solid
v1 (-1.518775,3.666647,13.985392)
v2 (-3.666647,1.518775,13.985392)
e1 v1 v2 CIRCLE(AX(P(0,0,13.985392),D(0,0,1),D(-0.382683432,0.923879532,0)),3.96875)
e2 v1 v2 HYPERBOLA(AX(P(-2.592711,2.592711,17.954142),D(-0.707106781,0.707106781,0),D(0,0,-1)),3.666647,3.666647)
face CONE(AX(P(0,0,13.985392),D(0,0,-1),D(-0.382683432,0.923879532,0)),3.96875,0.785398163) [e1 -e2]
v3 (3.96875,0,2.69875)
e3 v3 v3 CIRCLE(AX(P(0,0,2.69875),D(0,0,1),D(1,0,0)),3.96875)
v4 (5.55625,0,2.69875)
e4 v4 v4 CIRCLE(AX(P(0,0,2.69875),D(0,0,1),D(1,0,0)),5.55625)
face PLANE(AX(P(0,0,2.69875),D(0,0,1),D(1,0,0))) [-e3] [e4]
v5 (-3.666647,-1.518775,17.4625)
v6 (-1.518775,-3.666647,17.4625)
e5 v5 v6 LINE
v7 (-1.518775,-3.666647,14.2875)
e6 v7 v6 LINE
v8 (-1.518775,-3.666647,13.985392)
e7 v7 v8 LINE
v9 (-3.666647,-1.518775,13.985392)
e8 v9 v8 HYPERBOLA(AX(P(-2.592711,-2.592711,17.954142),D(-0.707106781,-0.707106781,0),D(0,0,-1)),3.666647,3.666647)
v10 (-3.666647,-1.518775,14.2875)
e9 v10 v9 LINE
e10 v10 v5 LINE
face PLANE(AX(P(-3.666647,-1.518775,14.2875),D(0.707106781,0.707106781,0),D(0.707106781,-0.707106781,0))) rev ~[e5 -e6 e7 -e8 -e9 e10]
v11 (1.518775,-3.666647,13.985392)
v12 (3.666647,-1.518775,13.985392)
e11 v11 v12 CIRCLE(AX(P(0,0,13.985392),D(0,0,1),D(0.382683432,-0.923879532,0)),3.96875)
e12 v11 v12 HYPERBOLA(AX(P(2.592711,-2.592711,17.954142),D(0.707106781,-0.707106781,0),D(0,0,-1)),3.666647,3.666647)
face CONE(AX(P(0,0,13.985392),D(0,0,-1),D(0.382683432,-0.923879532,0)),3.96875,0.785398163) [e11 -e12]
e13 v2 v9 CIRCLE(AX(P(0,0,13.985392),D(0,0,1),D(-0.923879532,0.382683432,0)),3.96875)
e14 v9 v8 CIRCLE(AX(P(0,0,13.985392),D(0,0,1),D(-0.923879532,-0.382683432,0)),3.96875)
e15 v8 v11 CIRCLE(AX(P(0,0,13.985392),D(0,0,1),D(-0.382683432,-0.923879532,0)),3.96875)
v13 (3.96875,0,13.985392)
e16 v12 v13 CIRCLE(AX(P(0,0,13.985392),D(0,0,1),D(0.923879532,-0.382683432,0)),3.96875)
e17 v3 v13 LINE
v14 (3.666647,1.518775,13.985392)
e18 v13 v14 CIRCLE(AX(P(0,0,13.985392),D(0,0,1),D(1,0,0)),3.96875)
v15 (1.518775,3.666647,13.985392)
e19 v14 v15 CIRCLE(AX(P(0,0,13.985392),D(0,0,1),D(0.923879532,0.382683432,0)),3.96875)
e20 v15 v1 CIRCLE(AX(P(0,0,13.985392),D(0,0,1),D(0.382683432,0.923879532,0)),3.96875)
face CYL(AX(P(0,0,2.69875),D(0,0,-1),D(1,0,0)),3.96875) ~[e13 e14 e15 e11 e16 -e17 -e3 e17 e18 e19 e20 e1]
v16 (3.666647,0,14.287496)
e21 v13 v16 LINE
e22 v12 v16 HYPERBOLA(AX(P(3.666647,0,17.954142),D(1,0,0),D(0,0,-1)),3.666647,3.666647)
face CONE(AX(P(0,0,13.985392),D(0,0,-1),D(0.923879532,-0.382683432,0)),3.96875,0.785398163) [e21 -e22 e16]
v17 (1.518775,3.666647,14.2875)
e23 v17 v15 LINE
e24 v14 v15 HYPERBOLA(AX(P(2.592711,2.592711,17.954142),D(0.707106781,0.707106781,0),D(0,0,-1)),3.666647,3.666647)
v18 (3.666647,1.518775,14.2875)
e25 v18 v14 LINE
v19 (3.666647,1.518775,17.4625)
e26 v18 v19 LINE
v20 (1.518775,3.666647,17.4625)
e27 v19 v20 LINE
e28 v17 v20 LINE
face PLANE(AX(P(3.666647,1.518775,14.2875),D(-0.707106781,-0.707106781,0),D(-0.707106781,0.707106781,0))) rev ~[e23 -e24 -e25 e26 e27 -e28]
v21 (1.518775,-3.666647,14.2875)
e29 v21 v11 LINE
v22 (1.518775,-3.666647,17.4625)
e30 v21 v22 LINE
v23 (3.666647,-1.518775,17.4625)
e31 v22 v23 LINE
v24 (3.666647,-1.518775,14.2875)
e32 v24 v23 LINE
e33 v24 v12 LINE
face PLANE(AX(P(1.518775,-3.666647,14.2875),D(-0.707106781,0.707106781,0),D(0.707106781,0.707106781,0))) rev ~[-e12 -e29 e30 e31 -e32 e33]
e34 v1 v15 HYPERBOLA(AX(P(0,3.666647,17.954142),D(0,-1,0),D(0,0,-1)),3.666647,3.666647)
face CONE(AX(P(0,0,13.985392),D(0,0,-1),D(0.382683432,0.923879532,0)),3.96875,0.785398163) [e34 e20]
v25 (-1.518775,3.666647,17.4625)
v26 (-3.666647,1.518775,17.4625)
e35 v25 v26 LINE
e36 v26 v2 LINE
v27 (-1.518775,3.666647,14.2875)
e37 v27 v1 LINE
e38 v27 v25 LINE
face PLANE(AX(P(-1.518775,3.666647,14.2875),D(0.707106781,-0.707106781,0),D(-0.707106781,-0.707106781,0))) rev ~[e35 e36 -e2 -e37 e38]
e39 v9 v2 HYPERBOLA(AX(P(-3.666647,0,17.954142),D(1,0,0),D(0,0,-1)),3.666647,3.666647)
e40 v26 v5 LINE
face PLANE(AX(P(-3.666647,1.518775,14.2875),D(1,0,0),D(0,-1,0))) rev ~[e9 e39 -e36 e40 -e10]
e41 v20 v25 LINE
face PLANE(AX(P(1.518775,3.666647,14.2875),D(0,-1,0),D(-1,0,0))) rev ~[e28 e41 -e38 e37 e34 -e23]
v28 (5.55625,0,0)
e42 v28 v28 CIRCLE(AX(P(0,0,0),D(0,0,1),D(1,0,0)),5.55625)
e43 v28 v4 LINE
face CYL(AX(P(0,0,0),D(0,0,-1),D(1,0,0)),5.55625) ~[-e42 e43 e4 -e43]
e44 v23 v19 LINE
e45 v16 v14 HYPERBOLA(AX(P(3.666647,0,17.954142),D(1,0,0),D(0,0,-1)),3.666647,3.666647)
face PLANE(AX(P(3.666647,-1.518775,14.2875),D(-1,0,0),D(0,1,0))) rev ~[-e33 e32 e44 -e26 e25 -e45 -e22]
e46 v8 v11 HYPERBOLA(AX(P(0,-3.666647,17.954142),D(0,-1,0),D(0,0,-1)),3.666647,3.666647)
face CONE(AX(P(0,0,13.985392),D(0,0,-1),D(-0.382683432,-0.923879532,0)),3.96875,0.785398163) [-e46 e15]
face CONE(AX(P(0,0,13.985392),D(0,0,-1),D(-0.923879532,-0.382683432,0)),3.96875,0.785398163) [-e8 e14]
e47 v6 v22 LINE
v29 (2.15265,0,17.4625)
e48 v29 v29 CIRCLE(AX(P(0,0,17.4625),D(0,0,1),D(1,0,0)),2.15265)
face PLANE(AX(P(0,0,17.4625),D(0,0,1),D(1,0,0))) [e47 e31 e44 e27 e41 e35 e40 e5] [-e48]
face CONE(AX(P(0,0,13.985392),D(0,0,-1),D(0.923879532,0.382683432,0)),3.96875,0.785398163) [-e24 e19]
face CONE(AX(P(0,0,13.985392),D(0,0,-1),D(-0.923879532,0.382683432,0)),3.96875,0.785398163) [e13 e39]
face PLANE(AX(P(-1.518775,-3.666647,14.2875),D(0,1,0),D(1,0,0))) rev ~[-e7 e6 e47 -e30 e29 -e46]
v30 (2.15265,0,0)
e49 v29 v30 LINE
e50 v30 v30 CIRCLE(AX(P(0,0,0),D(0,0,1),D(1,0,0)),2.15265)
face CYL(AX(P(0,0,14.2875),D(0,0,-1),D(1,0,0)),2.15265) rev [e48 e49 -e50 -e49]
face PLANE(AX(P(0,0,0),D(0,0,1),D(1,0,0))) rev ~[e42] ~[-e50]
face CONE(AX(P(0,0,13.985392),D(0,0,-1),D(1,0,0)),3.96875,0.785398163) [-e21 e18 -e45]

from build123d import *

# Parameters (mm, degrees)
F0_R         = 5.55625
F0_R_2       = 2.15265
F1_DEPTH     = 2.69875
F2_R         = 3.96875
F2_R_2       = 2.15265
F3_DEPTH     = 11.58875
F4_R         = 2.15265
F5_DEPTH     = 3.175
F6_T4_ANGLE  = 45
F6_T9_ANGLE  = 45
F6_T14_ANGLE = 45
F6_T19_ANGLE = 45
F6_T24_ANGLE = 45
F6_T29_ANGLE = 45
F6_T34_ANGLE = 45
F6_T39_ANGLE = 22.5
F6_T44_ANGLE = 22.5


# Not quite as in the source:
# - a fillet or chamfer that OpenCascade refuses, or shapes differently, is made with other operations: its cross-section is extruded or revolved along the edge and cut away or added


with BuildPart() as f1:
    # F0 (on Top) → F1 (new body)
    with BuildSketch(Plane.XY):
        Circle(F0_R)
        Circle(F0_R_2, mode=Mode.SUBTRACT)
    extrude(amount=F1_DEPTH)

    # F2 (on face) → F3 (join)
    with BuildSketch(Plane.XY.offset(2.69875)):
        Circle(F2_R)
        Circle(F2_R_2, mode=Mode.SUBTRACT)
    extrude(amount=F3_DEPTH)

    # F4 (on face) → F5 (join)
    with BuildSketch(Plane.XY.offset(14.2875)):
        Polygon((-3.6666468947, 1.5187748722), (-3.6666468947, -1.5187748722), (-1.5187748722, -3.6666468947), (1.5187748722, -3.6666468947), (3.6666468947, -1.5187748722), (3.6666468947, 1.5187748722), (1.5187748722, 3.6666468947), (-1.5187748722, 3.6666468947), align=None)
        Circle(F4_R, mode=Mode.SUBTRACT)
    extrude(amount=F5_DEPTH)

    # F6: chamfer of 0.3021076 on 7 edges, made by hand


with BuildPart() as f6_tool2:
    # F6_s3 → F6_t4 (revolve)
    with BuildSketch(Plane(origin=(0, 0, 0), x_dir=(0, 0, 1), z_dir=(0.3826834324, 0.9238795325, 0))):
        Polygon((13.9853924, -3.96875), (14.2875, -3.6666424), (14.2875, -3.96875), align=None)
    revolve(axis=Axis((0, 0, 14.2875), (0, 0, 1)), revolution_arc=F6_T4_ANGLE)

    split(bisect_by=Plane.YZ.offset(-3.6666468947), keep=Keep.BOTTOM)


with BuildPart() as f1_1:
    add(f1.part)

    # F6_t1: cut F6_tool2
    add(f6_tool2.part, mode=Mode.SUBTRACT)


with BuildPart() as f6_tool7:
    # F6_s8 → F6_t9 (revolve)
    with BuildSketch(Plane(origin=(0, 0, 0), x_dir=(0, 0, 1), z_dir=(0.9238795325, 0.3826834324, 0))):
        Polygon((13.9853924, -3.96875), (14.2875, -3.6666424), (14.2875, -3.96875), align=None)
    revolve(axis=Axis((0, 0, 14.2875), (0, 0, 1)), revolution_arc=F6_T9_ANGLE)

    split(bisect_by=Plane(origin=(-2.5927108834, 2.5927108834, 0), x_dir=(0, 0, 1), z_dir=(-0.7071067812, 0.7071067812, 0)), keep=Keep.TOP)


with BuildPart() as f1_2:
    add(f1_1.part)

    # F6_t6: cut F6_tool7
    add(f6_tool7.part, mode=Mode.SUBTRACT)


with BuildPart() as f6_tool12:
    # F6_s13 → F6_t14 (revolve)
    with BuildSketch(Plane(origin=(0, 0, 0), x_dir=(0, 0, 1), z_dir=(0.9238795325, -0.3826834324, 0))):
        Polygon((13.9853924, -3.96875), (14.2875, -3.6666424), (14.2875, -3.96875), align=None)
    revolve(axis=Axis((0, 0, 14.2875), (0, 0, 1)), revolution_arc=F6_T14_ANGLE)

    split(bisect_by=Plane.XZ.offset(-3.6666468947), keep=Keep.BOTTOM)


with BuildPart() as f1_3:
    add(f1_2.part)

    # F6_t11: cut F6_tool12
    add(f6_tool12.part, mode=Mode.SUBTRACT)


with BuildPart() as f6_tool17:
    # F6_s18 → F6_t19 (revolve)
    with BuildSketch(Plane(origin=(0, 0, 0), x_dir=(0, 0, 1), z_dir=(0.3826834324, -0.9238795325, 0))):
        Polygon((13.9853924, -3.96875), (14.2875, -3.6666424), (14.2875, -3.96875), align=None)
    revolve(axis=Axis((0, 0, 14.2875), (0, 0, 1)), revolution_arc=F6_T19_ANGLE)

    split(bisect_by=Plane(origin=(2.5927108834, 2.5927108834, 0), x_dir=(0, 0, 1), z_dir=(0.7071067812, 0.7071067812, 0)), keep=Keep.TOP)


with BuildPart() as f1_4:
    add(f1_3.part)

    # F6_t16: cut F6_tool17
    add(f6_tool17.part, mode=Mode.SUBTRACT)


with BuildPart() as f6_tool22:
    # F6_s23 → F6_t24 (revolve)
    with BuildSketch(Plane(origin=(0, 0, 0), x_dir=(0, 0, 1), z_dir=(-0.9238795325, -0.3826834324, 0))):
        Polygon((13.9853924, -3.96875), (14.2875, -3.6666424), (14.2875, -3.96875), align=None)
    revolve(axis=Axis((0, 0, 14.2875), (0, 0, 1)), revolution_arc=F6_T24_ANGLE)

    split(bisect_by=Plane(origin=(2.5927108834, -2.5927108834, 0), x_dir=(0, 0, 1), z_dir=(0.7071067812, -0.7071067812, 0)), keep=Keep.TOP)


with BuildPart() as f1_5:
    add(f1_4.part)

    # F6_t21: cut F6_tool22
    add(f6_tool22.part, mode=Mode.SUBTRACT)


with BuildPart() as f6_tool27:
    # F6_s28 → F6_t29 (revolve)
    with BuildSketch(Plane(origin=(0, 0, 0), x_dir=(0, 0, 1), z_dir=(-0.9238795325, 0.3826834324, 0))):
        Polygon((13.9853924, -3.96875), (14.2875, -3.6666424), (14.2875, -3.96875), align=None)
    revolve(axis=Axis((0, 0, 14.2875), (0, 0, 1)), revolution_arc=F6_T29_ANGLE)

    split(bisect_by=Plane.XZ.offset(3.6666468947), keep=Keep.TOP)


with BuildPart() as f1_6:
    add(f1_5.part)

    # F6_t26: cut F6_tool27
    add(f6_tool27.part, mode=Mode.SUBTRACT)


with BuildPart() as f6_tool32:
    # F6_s33 → F6_t34 (revolve)
    with BuildSketch(Plane(origin=(0, 0, 0), x_dir=(0, 0, 1), z_dir=(-0.3826834324, 0.9238795325, 0))):
        Polygon((13.9853924, -3.96875), (14.2875, -3.6666424), (14.2875, -3.96875), align=None)
    revolve(axis=Axis((0, 0, 14.2875), (0, 0, 1)), revolution_arc=F6_T34_ANGLE)

    split(bisect_by=Plane(origin=(-2.5927108834, -2.5927108834, 0), x_dir=(0, 0, 1), z_dir=(-0.7071067812, -0.7071067812, 0)), keep=Keep.TOP)


with BuildPart() as f1_7:
    add(f1_6.part)

    # F6_t31: cut F6_tool32
    add(f6_tool32.part, mode=Mode.SUBTRACT)


with BuildPart() as f6_tool37:
    # F6_s38 → F6_t39 (revolve)
    with BuildSketch(Plane(origin=(0, 0, 0), x_dir=(0, 0, 1), z_dir=(-0.3826834324, -0.9238795325, 0))):
        Polygon((13.9853924, -3.96875), (14.2875, -3.6666424), (14.2875, -3.96875), align=None)
    revolve(axis=Axis((0, 0, 14.2875), (0, 0, 1)), revolution_arc=F6_T39_ANGLE)

    split(bisect_by=Plane.YZ.offset(3.6666468947), keep=Keep.TOP)


with BuildPart() as f1_8:
    add(f1_7.part)

    # F6_t36: cut F6_tool37
    add(f6_tool37.part, mode=Mode.SUBTRACT)


with BuildPart() as f6_tool42:
    # F6_s43 → F6_t44 (revolve)
    with BuildSketch(Plane.XZ):
        Polygon((3.96875, 13.9853924), (3.6666424, 14.2875), (3.96875, 14.2875), align=None)
    revolve(axis=Axis((0, 0, 14.2875), (0, 0, 1)), revolution_arc=F6_T44_ANGLE)

    split(bisect_by=Plane.YZ.offset(3.6666468947), keep=Keep.TOP)


with BuildPart() as f1_9:
    add(f1_8.part)

    # F6_t41: cut F6_tool42
    add(f6_tool42.part, mode=Mode.SUBTRACT)


solid = f1_9.part
